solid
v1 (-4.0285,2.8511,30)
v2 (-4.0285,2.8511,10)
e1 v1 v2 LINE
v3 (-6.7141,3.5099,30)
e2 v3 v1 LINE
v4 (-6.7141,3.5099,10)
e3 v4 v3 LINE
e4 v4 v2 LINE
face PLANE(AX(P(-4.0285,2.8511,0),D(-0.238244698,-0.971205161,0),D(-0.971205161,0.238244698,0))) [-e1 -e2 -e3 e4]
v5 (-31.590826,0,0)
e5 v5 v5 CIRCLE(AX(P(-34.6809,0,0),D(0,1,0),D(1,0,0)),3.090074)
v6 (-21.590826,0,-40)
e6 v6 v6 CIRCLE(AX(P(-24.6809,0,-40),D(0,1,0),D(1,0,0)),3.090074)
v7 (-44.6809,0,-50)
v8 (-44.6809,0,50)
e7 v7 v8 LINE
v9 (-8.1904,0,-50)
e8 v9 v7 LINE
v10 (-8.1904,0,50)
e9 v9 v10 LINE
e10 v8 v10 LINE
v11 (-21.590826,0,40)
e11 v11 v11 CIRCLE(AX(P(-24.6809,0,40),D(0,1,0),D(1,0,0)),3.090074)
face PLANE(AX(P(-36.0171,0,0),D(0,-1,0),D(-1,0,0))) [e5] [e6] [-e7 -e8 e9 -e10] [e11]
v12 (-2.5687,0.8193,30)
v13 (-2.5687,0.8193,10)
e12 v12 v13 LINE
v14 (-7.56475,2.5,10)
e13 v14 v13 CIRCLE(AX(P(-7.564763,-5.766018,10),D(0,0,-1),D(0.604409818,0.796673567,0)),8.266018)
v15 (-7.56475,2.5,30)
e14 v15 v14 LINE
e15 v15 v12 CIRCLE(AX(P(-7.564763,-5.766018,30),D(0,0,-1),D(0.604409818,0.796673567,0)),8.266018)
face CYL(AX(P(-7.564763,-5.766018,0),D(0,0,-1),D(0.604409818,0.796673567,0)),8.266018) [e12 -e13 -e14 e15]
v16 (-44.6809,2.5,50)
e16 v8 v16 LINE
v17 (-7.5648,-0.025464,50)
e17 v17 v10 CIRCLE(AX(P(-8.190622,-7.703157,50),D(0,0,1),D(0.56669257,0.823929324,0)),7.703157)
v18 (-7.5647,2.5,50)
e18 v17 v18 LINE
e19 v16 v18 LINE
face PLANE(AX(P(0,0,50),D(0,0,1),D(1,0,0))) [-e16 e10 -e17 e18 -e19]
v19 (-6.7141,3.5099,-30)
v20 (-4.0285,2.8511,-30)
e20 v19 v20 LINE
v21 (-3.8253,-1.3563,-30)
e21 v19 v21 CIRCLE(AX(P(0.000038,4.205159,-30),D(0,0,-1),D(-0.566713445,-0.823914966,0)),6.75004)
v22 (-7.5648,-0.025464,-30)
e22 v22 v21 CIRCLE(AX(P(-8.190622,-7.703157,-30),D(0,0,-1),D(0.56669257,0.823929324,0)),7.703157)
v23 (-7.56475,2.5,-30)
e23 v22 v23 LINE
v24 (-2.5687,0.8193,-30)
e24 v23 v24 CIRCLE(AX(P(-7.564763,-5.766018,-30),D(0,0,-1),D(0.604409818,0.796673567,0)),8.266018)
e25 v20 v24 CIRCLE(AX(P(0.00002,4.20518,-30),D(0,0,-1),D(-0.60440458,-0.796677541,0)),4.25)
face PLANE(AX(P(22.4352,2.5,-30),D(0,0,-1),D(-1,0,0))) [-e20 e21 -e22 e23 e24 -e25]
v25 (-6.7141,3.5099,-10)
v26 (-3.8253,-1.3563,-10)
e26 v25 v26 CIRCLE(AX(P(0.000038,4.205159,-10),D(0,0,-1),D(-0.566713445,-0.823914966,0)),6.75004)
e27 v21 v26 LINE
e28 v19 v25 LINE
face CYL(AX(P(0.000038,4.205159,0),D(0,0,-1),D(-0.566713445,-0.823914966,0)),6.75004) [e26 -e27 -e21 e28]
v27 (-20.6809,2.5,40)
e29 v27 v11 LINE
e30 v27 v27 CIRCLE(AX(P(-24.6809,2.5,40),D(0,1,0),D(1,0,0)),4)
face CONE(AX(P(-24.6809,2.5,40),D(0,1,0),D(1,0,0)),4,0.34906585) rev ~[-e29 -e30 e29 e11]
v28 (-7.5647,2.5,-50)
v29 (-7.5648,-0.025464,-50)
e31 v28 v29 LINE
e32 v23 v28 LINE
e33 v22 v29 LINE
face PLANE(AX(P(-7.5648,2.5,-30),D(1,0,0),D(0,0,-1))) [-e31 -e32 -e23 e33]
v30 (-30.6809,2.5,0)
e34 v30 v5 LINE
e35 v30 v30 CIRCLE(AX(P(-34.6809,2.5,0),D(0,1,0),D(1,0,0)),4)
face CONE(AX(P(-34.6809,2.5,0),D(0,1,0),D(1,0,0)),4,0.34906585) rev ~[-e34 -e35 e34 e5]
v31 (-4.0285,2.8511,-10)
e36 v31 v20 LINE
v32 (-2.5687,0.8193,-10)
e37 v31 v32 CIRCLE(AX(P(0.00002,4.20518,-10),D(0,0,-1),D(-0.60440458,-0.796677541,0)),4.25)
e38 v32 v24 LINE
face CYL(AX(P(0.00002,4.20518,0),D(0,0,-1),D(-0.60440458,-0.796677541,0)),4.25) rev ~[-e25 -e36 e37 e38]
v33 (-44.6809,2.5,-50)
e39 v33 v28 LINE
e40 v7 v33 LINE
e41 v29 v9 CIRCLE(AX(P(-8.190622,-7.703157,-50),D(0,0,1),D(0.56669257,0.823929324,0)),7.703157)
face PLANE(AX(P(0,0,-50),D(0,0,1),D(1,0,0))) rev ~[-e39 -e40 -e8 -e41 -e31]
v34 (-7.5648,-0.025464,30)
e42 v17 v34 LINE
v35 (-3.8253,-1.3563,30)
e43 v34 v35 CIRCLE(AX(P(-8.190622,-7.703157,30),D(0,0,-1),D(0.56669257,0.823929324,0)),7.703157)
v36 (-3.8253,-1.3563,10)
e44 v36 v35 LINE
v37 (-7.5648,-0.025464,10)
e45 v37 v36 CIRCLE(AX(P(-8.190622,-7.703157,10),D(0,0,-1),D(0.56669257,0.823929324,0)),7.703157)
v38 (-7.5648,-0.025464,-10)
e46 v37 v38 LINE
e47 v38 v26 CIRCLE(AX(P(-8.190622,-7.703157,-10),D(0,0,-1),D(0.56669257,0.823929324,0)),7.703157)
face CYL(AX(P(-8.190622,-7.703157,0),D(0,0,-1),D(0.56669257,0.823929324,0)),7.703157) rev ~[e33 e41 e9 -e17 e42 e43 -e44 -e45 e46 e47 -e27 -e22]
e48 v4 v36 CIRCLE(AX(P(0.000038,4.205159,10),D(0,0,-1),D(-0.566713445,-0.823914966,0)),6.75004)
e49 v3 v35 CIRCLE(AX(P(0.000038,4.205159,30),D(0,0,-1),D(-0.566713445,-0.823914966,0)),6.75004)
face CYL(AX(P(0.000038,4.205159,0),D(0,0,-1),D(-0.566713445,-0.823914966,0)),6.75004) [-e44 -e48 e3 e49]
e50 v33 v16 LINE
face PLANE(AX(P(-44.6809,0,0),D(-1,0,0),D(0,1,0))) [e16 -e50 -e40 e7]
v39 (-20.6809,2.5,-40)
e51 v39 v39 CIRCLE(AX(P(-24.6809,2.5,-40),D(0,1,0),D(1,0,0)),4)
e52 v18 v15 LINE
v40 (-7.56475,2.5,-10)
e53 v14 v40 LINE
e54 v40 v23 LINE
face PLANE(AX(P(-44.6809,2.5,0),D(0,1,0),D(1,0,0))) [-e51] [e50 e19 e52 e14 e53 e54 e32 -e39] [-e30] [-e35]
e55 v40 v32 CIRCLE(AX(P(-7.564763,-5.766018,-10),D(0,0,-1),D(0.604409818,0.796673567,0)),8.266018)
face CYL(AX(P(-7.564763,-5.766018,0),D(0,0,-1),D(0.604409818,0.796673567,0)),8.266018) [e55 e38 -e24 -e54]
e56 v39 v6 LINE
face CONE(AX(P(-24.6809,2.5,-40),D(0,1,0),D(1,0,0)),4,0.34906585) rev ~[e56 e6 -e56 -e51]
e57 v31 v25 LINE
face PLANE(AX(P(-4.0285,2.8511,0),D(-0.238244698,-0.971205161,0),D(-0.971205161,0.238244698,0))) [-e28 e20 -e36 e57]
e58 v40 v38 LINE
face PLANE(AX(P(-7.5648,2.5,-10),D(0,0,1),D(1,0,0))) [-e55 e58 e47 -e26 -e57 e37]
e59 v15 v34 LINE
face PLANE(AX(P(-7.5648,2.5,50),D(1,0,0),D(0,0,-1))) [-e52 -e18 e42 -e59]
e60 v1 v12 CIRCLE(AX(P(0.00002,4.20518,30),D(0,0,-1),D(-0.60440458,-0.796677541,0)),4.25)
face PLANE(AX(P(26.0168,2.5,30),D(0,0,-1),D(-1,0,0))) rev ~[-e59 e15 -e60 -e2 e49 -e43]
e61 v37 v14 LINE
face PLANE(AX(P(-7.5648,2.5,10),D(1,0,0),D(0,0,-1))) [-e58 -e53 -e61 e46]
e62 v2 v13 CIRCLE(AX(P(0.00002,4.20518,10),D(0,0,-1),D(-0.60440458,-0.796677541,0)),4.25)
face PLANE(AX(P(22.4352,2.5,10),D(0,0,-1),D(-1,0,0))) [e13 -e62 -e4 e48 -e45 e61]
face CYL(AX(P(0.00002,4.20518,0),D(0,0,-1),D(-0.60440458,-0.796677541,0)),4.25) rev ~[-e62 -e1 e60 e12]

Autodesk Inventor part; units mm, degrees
ref_plane "YZ Plane" through (0, 0, 0) normal (1, 0, 0) x (0, 1, 0)
ref_plane "XZ Plane" through (0, 0, 0) normal (0, 1, 0) x (-1, 0, 0)
ref_plane "XY Plane" through (0, 0, 0) normal (0, 0, 1) x (1, 0, 0)
sketch "Sketch1" plane through (0, 0, 0) normal (0, 0, 1) x (1, 0, 0)
  line L0 (-44.6809, 2.5) -> (-7.5647, 2.5)
  line L1 (-44.6809, 0) -> (-44.6809, 2.5)
  line L2 (0, 0) -> (0, 19.2246)
  arc A0 (-3.8253, -1.3563) -> (-6.7141, 3.5099) centre (0, 4.2052) ccw
  arc A1 (-2.5687, 0.8193) -> (-4.0285, 2.8511) centre (0, 4.2052) ccw
  arc A2 (-2.5687, 0.8193) -> (-7.5647, 2.5) centre (-7.5647, -5.7659) ccw
  line L3 (-4.0285, 2.8511) -> (-6.7141, 3.5099)
  arc A3 (-3.8253, -1.3563) -> (-8.1904, 0) centre (-8.1904, -7.7027) ccw
  line L4 (-8.1904, 0) -> (-44.6809, 0)
  line L5 (-36.0171, 0) -> (-5.5909, 0)
  line L6 (-5.2801, 0) -> (0, 0)
  point P0 (0, 10.9552)
  point P1 (0, 8.4552)
  dimension "d1" = 2.5
  dimension "d2" = 2.5
  dimension "d3" = 8.5
extrude "Extrusion1" add sketch "Sketch1" along normal mid plane 100 contours L0 A2 A1 L2 A0 A3 L4 L1 | A1 L3 A0 L2
sketch "Sketch2" plane through (-44.6809, 2.5, 50) normal (0, 1, 0) x (1, 0, 0)
  circle A0 centre (20, 90) radius 4
  circle A1 centre (10, 50) radius 4
  circle A2 centre (20, 10) radius 4
  line L0 (0, 100) -> (37.1161, 100) projected
  line L1 (0, 100) -> (0, 0) projected
  line L2 (37.1161, 0) -> (0, 0) projected
  point P0 (44.6809, 50)
  dimension "d6" = 8
  dimension "d7" = 8
  dimension "d8" = 8
  dimension "d9" = 10
  dimension "d10" = 20
  dimension "d11" = 20
  dimension "d12" = 10
  dimension "d13" = 10
  dimension "d14" = 50
extrude "Extrusion2" cut sketch "Sketch2" against normal up to next draft -20
sketch "Sketch3" plane through (-44.6809, 2.5, 50) normal (0, 1, 0) x (1, 0, 0)
  line L0 (37.1161, 0) -> (37.1161, 100) projected
  line L1 (37.1161, 100) -> (67.1161, 100)
  line L2 (67.1161, 100) -> (67.1161, 80)
  line L3 (67.1161, 80) -> (37.1161, 80)
  line L4 (37.1161, 80) -> (37.1161, 100)
  line L5 (37.1161, 60) -> (67.1161, 60)
  line L6 (67.1161, 60) -> (67.1161, 40)
  line L7 (67.1161, 40) -> (37.1161, 40)
  line L8 (37.1161, 40) -> (37.1161, 60)
  line L9 (37.1161, 0) -> (0, 0) projected
  line L10 (37.1161, 0) -> (70.6977, 0)
  line L11 (70.6977, 0) -> (70.6977, 20)
  line L12 (70.6977, 20) -> (37.1161, 20)
  line L13 (37.1161, 20) -> (37.1161, 0)
  point P0 (44.6809, 50)
  point P1 (37.1161, 20)
  dimension "d17" = 20
  dimension "d18" = 30
  dimension "d19" = 20
  dimension "d20" = 20
  dimension "d21" = 20
extrude "Extrusion3" cut sketch "Sketch3" against normal mid plane 100
properties part number "Hinge1" material "Stainless Steel"
